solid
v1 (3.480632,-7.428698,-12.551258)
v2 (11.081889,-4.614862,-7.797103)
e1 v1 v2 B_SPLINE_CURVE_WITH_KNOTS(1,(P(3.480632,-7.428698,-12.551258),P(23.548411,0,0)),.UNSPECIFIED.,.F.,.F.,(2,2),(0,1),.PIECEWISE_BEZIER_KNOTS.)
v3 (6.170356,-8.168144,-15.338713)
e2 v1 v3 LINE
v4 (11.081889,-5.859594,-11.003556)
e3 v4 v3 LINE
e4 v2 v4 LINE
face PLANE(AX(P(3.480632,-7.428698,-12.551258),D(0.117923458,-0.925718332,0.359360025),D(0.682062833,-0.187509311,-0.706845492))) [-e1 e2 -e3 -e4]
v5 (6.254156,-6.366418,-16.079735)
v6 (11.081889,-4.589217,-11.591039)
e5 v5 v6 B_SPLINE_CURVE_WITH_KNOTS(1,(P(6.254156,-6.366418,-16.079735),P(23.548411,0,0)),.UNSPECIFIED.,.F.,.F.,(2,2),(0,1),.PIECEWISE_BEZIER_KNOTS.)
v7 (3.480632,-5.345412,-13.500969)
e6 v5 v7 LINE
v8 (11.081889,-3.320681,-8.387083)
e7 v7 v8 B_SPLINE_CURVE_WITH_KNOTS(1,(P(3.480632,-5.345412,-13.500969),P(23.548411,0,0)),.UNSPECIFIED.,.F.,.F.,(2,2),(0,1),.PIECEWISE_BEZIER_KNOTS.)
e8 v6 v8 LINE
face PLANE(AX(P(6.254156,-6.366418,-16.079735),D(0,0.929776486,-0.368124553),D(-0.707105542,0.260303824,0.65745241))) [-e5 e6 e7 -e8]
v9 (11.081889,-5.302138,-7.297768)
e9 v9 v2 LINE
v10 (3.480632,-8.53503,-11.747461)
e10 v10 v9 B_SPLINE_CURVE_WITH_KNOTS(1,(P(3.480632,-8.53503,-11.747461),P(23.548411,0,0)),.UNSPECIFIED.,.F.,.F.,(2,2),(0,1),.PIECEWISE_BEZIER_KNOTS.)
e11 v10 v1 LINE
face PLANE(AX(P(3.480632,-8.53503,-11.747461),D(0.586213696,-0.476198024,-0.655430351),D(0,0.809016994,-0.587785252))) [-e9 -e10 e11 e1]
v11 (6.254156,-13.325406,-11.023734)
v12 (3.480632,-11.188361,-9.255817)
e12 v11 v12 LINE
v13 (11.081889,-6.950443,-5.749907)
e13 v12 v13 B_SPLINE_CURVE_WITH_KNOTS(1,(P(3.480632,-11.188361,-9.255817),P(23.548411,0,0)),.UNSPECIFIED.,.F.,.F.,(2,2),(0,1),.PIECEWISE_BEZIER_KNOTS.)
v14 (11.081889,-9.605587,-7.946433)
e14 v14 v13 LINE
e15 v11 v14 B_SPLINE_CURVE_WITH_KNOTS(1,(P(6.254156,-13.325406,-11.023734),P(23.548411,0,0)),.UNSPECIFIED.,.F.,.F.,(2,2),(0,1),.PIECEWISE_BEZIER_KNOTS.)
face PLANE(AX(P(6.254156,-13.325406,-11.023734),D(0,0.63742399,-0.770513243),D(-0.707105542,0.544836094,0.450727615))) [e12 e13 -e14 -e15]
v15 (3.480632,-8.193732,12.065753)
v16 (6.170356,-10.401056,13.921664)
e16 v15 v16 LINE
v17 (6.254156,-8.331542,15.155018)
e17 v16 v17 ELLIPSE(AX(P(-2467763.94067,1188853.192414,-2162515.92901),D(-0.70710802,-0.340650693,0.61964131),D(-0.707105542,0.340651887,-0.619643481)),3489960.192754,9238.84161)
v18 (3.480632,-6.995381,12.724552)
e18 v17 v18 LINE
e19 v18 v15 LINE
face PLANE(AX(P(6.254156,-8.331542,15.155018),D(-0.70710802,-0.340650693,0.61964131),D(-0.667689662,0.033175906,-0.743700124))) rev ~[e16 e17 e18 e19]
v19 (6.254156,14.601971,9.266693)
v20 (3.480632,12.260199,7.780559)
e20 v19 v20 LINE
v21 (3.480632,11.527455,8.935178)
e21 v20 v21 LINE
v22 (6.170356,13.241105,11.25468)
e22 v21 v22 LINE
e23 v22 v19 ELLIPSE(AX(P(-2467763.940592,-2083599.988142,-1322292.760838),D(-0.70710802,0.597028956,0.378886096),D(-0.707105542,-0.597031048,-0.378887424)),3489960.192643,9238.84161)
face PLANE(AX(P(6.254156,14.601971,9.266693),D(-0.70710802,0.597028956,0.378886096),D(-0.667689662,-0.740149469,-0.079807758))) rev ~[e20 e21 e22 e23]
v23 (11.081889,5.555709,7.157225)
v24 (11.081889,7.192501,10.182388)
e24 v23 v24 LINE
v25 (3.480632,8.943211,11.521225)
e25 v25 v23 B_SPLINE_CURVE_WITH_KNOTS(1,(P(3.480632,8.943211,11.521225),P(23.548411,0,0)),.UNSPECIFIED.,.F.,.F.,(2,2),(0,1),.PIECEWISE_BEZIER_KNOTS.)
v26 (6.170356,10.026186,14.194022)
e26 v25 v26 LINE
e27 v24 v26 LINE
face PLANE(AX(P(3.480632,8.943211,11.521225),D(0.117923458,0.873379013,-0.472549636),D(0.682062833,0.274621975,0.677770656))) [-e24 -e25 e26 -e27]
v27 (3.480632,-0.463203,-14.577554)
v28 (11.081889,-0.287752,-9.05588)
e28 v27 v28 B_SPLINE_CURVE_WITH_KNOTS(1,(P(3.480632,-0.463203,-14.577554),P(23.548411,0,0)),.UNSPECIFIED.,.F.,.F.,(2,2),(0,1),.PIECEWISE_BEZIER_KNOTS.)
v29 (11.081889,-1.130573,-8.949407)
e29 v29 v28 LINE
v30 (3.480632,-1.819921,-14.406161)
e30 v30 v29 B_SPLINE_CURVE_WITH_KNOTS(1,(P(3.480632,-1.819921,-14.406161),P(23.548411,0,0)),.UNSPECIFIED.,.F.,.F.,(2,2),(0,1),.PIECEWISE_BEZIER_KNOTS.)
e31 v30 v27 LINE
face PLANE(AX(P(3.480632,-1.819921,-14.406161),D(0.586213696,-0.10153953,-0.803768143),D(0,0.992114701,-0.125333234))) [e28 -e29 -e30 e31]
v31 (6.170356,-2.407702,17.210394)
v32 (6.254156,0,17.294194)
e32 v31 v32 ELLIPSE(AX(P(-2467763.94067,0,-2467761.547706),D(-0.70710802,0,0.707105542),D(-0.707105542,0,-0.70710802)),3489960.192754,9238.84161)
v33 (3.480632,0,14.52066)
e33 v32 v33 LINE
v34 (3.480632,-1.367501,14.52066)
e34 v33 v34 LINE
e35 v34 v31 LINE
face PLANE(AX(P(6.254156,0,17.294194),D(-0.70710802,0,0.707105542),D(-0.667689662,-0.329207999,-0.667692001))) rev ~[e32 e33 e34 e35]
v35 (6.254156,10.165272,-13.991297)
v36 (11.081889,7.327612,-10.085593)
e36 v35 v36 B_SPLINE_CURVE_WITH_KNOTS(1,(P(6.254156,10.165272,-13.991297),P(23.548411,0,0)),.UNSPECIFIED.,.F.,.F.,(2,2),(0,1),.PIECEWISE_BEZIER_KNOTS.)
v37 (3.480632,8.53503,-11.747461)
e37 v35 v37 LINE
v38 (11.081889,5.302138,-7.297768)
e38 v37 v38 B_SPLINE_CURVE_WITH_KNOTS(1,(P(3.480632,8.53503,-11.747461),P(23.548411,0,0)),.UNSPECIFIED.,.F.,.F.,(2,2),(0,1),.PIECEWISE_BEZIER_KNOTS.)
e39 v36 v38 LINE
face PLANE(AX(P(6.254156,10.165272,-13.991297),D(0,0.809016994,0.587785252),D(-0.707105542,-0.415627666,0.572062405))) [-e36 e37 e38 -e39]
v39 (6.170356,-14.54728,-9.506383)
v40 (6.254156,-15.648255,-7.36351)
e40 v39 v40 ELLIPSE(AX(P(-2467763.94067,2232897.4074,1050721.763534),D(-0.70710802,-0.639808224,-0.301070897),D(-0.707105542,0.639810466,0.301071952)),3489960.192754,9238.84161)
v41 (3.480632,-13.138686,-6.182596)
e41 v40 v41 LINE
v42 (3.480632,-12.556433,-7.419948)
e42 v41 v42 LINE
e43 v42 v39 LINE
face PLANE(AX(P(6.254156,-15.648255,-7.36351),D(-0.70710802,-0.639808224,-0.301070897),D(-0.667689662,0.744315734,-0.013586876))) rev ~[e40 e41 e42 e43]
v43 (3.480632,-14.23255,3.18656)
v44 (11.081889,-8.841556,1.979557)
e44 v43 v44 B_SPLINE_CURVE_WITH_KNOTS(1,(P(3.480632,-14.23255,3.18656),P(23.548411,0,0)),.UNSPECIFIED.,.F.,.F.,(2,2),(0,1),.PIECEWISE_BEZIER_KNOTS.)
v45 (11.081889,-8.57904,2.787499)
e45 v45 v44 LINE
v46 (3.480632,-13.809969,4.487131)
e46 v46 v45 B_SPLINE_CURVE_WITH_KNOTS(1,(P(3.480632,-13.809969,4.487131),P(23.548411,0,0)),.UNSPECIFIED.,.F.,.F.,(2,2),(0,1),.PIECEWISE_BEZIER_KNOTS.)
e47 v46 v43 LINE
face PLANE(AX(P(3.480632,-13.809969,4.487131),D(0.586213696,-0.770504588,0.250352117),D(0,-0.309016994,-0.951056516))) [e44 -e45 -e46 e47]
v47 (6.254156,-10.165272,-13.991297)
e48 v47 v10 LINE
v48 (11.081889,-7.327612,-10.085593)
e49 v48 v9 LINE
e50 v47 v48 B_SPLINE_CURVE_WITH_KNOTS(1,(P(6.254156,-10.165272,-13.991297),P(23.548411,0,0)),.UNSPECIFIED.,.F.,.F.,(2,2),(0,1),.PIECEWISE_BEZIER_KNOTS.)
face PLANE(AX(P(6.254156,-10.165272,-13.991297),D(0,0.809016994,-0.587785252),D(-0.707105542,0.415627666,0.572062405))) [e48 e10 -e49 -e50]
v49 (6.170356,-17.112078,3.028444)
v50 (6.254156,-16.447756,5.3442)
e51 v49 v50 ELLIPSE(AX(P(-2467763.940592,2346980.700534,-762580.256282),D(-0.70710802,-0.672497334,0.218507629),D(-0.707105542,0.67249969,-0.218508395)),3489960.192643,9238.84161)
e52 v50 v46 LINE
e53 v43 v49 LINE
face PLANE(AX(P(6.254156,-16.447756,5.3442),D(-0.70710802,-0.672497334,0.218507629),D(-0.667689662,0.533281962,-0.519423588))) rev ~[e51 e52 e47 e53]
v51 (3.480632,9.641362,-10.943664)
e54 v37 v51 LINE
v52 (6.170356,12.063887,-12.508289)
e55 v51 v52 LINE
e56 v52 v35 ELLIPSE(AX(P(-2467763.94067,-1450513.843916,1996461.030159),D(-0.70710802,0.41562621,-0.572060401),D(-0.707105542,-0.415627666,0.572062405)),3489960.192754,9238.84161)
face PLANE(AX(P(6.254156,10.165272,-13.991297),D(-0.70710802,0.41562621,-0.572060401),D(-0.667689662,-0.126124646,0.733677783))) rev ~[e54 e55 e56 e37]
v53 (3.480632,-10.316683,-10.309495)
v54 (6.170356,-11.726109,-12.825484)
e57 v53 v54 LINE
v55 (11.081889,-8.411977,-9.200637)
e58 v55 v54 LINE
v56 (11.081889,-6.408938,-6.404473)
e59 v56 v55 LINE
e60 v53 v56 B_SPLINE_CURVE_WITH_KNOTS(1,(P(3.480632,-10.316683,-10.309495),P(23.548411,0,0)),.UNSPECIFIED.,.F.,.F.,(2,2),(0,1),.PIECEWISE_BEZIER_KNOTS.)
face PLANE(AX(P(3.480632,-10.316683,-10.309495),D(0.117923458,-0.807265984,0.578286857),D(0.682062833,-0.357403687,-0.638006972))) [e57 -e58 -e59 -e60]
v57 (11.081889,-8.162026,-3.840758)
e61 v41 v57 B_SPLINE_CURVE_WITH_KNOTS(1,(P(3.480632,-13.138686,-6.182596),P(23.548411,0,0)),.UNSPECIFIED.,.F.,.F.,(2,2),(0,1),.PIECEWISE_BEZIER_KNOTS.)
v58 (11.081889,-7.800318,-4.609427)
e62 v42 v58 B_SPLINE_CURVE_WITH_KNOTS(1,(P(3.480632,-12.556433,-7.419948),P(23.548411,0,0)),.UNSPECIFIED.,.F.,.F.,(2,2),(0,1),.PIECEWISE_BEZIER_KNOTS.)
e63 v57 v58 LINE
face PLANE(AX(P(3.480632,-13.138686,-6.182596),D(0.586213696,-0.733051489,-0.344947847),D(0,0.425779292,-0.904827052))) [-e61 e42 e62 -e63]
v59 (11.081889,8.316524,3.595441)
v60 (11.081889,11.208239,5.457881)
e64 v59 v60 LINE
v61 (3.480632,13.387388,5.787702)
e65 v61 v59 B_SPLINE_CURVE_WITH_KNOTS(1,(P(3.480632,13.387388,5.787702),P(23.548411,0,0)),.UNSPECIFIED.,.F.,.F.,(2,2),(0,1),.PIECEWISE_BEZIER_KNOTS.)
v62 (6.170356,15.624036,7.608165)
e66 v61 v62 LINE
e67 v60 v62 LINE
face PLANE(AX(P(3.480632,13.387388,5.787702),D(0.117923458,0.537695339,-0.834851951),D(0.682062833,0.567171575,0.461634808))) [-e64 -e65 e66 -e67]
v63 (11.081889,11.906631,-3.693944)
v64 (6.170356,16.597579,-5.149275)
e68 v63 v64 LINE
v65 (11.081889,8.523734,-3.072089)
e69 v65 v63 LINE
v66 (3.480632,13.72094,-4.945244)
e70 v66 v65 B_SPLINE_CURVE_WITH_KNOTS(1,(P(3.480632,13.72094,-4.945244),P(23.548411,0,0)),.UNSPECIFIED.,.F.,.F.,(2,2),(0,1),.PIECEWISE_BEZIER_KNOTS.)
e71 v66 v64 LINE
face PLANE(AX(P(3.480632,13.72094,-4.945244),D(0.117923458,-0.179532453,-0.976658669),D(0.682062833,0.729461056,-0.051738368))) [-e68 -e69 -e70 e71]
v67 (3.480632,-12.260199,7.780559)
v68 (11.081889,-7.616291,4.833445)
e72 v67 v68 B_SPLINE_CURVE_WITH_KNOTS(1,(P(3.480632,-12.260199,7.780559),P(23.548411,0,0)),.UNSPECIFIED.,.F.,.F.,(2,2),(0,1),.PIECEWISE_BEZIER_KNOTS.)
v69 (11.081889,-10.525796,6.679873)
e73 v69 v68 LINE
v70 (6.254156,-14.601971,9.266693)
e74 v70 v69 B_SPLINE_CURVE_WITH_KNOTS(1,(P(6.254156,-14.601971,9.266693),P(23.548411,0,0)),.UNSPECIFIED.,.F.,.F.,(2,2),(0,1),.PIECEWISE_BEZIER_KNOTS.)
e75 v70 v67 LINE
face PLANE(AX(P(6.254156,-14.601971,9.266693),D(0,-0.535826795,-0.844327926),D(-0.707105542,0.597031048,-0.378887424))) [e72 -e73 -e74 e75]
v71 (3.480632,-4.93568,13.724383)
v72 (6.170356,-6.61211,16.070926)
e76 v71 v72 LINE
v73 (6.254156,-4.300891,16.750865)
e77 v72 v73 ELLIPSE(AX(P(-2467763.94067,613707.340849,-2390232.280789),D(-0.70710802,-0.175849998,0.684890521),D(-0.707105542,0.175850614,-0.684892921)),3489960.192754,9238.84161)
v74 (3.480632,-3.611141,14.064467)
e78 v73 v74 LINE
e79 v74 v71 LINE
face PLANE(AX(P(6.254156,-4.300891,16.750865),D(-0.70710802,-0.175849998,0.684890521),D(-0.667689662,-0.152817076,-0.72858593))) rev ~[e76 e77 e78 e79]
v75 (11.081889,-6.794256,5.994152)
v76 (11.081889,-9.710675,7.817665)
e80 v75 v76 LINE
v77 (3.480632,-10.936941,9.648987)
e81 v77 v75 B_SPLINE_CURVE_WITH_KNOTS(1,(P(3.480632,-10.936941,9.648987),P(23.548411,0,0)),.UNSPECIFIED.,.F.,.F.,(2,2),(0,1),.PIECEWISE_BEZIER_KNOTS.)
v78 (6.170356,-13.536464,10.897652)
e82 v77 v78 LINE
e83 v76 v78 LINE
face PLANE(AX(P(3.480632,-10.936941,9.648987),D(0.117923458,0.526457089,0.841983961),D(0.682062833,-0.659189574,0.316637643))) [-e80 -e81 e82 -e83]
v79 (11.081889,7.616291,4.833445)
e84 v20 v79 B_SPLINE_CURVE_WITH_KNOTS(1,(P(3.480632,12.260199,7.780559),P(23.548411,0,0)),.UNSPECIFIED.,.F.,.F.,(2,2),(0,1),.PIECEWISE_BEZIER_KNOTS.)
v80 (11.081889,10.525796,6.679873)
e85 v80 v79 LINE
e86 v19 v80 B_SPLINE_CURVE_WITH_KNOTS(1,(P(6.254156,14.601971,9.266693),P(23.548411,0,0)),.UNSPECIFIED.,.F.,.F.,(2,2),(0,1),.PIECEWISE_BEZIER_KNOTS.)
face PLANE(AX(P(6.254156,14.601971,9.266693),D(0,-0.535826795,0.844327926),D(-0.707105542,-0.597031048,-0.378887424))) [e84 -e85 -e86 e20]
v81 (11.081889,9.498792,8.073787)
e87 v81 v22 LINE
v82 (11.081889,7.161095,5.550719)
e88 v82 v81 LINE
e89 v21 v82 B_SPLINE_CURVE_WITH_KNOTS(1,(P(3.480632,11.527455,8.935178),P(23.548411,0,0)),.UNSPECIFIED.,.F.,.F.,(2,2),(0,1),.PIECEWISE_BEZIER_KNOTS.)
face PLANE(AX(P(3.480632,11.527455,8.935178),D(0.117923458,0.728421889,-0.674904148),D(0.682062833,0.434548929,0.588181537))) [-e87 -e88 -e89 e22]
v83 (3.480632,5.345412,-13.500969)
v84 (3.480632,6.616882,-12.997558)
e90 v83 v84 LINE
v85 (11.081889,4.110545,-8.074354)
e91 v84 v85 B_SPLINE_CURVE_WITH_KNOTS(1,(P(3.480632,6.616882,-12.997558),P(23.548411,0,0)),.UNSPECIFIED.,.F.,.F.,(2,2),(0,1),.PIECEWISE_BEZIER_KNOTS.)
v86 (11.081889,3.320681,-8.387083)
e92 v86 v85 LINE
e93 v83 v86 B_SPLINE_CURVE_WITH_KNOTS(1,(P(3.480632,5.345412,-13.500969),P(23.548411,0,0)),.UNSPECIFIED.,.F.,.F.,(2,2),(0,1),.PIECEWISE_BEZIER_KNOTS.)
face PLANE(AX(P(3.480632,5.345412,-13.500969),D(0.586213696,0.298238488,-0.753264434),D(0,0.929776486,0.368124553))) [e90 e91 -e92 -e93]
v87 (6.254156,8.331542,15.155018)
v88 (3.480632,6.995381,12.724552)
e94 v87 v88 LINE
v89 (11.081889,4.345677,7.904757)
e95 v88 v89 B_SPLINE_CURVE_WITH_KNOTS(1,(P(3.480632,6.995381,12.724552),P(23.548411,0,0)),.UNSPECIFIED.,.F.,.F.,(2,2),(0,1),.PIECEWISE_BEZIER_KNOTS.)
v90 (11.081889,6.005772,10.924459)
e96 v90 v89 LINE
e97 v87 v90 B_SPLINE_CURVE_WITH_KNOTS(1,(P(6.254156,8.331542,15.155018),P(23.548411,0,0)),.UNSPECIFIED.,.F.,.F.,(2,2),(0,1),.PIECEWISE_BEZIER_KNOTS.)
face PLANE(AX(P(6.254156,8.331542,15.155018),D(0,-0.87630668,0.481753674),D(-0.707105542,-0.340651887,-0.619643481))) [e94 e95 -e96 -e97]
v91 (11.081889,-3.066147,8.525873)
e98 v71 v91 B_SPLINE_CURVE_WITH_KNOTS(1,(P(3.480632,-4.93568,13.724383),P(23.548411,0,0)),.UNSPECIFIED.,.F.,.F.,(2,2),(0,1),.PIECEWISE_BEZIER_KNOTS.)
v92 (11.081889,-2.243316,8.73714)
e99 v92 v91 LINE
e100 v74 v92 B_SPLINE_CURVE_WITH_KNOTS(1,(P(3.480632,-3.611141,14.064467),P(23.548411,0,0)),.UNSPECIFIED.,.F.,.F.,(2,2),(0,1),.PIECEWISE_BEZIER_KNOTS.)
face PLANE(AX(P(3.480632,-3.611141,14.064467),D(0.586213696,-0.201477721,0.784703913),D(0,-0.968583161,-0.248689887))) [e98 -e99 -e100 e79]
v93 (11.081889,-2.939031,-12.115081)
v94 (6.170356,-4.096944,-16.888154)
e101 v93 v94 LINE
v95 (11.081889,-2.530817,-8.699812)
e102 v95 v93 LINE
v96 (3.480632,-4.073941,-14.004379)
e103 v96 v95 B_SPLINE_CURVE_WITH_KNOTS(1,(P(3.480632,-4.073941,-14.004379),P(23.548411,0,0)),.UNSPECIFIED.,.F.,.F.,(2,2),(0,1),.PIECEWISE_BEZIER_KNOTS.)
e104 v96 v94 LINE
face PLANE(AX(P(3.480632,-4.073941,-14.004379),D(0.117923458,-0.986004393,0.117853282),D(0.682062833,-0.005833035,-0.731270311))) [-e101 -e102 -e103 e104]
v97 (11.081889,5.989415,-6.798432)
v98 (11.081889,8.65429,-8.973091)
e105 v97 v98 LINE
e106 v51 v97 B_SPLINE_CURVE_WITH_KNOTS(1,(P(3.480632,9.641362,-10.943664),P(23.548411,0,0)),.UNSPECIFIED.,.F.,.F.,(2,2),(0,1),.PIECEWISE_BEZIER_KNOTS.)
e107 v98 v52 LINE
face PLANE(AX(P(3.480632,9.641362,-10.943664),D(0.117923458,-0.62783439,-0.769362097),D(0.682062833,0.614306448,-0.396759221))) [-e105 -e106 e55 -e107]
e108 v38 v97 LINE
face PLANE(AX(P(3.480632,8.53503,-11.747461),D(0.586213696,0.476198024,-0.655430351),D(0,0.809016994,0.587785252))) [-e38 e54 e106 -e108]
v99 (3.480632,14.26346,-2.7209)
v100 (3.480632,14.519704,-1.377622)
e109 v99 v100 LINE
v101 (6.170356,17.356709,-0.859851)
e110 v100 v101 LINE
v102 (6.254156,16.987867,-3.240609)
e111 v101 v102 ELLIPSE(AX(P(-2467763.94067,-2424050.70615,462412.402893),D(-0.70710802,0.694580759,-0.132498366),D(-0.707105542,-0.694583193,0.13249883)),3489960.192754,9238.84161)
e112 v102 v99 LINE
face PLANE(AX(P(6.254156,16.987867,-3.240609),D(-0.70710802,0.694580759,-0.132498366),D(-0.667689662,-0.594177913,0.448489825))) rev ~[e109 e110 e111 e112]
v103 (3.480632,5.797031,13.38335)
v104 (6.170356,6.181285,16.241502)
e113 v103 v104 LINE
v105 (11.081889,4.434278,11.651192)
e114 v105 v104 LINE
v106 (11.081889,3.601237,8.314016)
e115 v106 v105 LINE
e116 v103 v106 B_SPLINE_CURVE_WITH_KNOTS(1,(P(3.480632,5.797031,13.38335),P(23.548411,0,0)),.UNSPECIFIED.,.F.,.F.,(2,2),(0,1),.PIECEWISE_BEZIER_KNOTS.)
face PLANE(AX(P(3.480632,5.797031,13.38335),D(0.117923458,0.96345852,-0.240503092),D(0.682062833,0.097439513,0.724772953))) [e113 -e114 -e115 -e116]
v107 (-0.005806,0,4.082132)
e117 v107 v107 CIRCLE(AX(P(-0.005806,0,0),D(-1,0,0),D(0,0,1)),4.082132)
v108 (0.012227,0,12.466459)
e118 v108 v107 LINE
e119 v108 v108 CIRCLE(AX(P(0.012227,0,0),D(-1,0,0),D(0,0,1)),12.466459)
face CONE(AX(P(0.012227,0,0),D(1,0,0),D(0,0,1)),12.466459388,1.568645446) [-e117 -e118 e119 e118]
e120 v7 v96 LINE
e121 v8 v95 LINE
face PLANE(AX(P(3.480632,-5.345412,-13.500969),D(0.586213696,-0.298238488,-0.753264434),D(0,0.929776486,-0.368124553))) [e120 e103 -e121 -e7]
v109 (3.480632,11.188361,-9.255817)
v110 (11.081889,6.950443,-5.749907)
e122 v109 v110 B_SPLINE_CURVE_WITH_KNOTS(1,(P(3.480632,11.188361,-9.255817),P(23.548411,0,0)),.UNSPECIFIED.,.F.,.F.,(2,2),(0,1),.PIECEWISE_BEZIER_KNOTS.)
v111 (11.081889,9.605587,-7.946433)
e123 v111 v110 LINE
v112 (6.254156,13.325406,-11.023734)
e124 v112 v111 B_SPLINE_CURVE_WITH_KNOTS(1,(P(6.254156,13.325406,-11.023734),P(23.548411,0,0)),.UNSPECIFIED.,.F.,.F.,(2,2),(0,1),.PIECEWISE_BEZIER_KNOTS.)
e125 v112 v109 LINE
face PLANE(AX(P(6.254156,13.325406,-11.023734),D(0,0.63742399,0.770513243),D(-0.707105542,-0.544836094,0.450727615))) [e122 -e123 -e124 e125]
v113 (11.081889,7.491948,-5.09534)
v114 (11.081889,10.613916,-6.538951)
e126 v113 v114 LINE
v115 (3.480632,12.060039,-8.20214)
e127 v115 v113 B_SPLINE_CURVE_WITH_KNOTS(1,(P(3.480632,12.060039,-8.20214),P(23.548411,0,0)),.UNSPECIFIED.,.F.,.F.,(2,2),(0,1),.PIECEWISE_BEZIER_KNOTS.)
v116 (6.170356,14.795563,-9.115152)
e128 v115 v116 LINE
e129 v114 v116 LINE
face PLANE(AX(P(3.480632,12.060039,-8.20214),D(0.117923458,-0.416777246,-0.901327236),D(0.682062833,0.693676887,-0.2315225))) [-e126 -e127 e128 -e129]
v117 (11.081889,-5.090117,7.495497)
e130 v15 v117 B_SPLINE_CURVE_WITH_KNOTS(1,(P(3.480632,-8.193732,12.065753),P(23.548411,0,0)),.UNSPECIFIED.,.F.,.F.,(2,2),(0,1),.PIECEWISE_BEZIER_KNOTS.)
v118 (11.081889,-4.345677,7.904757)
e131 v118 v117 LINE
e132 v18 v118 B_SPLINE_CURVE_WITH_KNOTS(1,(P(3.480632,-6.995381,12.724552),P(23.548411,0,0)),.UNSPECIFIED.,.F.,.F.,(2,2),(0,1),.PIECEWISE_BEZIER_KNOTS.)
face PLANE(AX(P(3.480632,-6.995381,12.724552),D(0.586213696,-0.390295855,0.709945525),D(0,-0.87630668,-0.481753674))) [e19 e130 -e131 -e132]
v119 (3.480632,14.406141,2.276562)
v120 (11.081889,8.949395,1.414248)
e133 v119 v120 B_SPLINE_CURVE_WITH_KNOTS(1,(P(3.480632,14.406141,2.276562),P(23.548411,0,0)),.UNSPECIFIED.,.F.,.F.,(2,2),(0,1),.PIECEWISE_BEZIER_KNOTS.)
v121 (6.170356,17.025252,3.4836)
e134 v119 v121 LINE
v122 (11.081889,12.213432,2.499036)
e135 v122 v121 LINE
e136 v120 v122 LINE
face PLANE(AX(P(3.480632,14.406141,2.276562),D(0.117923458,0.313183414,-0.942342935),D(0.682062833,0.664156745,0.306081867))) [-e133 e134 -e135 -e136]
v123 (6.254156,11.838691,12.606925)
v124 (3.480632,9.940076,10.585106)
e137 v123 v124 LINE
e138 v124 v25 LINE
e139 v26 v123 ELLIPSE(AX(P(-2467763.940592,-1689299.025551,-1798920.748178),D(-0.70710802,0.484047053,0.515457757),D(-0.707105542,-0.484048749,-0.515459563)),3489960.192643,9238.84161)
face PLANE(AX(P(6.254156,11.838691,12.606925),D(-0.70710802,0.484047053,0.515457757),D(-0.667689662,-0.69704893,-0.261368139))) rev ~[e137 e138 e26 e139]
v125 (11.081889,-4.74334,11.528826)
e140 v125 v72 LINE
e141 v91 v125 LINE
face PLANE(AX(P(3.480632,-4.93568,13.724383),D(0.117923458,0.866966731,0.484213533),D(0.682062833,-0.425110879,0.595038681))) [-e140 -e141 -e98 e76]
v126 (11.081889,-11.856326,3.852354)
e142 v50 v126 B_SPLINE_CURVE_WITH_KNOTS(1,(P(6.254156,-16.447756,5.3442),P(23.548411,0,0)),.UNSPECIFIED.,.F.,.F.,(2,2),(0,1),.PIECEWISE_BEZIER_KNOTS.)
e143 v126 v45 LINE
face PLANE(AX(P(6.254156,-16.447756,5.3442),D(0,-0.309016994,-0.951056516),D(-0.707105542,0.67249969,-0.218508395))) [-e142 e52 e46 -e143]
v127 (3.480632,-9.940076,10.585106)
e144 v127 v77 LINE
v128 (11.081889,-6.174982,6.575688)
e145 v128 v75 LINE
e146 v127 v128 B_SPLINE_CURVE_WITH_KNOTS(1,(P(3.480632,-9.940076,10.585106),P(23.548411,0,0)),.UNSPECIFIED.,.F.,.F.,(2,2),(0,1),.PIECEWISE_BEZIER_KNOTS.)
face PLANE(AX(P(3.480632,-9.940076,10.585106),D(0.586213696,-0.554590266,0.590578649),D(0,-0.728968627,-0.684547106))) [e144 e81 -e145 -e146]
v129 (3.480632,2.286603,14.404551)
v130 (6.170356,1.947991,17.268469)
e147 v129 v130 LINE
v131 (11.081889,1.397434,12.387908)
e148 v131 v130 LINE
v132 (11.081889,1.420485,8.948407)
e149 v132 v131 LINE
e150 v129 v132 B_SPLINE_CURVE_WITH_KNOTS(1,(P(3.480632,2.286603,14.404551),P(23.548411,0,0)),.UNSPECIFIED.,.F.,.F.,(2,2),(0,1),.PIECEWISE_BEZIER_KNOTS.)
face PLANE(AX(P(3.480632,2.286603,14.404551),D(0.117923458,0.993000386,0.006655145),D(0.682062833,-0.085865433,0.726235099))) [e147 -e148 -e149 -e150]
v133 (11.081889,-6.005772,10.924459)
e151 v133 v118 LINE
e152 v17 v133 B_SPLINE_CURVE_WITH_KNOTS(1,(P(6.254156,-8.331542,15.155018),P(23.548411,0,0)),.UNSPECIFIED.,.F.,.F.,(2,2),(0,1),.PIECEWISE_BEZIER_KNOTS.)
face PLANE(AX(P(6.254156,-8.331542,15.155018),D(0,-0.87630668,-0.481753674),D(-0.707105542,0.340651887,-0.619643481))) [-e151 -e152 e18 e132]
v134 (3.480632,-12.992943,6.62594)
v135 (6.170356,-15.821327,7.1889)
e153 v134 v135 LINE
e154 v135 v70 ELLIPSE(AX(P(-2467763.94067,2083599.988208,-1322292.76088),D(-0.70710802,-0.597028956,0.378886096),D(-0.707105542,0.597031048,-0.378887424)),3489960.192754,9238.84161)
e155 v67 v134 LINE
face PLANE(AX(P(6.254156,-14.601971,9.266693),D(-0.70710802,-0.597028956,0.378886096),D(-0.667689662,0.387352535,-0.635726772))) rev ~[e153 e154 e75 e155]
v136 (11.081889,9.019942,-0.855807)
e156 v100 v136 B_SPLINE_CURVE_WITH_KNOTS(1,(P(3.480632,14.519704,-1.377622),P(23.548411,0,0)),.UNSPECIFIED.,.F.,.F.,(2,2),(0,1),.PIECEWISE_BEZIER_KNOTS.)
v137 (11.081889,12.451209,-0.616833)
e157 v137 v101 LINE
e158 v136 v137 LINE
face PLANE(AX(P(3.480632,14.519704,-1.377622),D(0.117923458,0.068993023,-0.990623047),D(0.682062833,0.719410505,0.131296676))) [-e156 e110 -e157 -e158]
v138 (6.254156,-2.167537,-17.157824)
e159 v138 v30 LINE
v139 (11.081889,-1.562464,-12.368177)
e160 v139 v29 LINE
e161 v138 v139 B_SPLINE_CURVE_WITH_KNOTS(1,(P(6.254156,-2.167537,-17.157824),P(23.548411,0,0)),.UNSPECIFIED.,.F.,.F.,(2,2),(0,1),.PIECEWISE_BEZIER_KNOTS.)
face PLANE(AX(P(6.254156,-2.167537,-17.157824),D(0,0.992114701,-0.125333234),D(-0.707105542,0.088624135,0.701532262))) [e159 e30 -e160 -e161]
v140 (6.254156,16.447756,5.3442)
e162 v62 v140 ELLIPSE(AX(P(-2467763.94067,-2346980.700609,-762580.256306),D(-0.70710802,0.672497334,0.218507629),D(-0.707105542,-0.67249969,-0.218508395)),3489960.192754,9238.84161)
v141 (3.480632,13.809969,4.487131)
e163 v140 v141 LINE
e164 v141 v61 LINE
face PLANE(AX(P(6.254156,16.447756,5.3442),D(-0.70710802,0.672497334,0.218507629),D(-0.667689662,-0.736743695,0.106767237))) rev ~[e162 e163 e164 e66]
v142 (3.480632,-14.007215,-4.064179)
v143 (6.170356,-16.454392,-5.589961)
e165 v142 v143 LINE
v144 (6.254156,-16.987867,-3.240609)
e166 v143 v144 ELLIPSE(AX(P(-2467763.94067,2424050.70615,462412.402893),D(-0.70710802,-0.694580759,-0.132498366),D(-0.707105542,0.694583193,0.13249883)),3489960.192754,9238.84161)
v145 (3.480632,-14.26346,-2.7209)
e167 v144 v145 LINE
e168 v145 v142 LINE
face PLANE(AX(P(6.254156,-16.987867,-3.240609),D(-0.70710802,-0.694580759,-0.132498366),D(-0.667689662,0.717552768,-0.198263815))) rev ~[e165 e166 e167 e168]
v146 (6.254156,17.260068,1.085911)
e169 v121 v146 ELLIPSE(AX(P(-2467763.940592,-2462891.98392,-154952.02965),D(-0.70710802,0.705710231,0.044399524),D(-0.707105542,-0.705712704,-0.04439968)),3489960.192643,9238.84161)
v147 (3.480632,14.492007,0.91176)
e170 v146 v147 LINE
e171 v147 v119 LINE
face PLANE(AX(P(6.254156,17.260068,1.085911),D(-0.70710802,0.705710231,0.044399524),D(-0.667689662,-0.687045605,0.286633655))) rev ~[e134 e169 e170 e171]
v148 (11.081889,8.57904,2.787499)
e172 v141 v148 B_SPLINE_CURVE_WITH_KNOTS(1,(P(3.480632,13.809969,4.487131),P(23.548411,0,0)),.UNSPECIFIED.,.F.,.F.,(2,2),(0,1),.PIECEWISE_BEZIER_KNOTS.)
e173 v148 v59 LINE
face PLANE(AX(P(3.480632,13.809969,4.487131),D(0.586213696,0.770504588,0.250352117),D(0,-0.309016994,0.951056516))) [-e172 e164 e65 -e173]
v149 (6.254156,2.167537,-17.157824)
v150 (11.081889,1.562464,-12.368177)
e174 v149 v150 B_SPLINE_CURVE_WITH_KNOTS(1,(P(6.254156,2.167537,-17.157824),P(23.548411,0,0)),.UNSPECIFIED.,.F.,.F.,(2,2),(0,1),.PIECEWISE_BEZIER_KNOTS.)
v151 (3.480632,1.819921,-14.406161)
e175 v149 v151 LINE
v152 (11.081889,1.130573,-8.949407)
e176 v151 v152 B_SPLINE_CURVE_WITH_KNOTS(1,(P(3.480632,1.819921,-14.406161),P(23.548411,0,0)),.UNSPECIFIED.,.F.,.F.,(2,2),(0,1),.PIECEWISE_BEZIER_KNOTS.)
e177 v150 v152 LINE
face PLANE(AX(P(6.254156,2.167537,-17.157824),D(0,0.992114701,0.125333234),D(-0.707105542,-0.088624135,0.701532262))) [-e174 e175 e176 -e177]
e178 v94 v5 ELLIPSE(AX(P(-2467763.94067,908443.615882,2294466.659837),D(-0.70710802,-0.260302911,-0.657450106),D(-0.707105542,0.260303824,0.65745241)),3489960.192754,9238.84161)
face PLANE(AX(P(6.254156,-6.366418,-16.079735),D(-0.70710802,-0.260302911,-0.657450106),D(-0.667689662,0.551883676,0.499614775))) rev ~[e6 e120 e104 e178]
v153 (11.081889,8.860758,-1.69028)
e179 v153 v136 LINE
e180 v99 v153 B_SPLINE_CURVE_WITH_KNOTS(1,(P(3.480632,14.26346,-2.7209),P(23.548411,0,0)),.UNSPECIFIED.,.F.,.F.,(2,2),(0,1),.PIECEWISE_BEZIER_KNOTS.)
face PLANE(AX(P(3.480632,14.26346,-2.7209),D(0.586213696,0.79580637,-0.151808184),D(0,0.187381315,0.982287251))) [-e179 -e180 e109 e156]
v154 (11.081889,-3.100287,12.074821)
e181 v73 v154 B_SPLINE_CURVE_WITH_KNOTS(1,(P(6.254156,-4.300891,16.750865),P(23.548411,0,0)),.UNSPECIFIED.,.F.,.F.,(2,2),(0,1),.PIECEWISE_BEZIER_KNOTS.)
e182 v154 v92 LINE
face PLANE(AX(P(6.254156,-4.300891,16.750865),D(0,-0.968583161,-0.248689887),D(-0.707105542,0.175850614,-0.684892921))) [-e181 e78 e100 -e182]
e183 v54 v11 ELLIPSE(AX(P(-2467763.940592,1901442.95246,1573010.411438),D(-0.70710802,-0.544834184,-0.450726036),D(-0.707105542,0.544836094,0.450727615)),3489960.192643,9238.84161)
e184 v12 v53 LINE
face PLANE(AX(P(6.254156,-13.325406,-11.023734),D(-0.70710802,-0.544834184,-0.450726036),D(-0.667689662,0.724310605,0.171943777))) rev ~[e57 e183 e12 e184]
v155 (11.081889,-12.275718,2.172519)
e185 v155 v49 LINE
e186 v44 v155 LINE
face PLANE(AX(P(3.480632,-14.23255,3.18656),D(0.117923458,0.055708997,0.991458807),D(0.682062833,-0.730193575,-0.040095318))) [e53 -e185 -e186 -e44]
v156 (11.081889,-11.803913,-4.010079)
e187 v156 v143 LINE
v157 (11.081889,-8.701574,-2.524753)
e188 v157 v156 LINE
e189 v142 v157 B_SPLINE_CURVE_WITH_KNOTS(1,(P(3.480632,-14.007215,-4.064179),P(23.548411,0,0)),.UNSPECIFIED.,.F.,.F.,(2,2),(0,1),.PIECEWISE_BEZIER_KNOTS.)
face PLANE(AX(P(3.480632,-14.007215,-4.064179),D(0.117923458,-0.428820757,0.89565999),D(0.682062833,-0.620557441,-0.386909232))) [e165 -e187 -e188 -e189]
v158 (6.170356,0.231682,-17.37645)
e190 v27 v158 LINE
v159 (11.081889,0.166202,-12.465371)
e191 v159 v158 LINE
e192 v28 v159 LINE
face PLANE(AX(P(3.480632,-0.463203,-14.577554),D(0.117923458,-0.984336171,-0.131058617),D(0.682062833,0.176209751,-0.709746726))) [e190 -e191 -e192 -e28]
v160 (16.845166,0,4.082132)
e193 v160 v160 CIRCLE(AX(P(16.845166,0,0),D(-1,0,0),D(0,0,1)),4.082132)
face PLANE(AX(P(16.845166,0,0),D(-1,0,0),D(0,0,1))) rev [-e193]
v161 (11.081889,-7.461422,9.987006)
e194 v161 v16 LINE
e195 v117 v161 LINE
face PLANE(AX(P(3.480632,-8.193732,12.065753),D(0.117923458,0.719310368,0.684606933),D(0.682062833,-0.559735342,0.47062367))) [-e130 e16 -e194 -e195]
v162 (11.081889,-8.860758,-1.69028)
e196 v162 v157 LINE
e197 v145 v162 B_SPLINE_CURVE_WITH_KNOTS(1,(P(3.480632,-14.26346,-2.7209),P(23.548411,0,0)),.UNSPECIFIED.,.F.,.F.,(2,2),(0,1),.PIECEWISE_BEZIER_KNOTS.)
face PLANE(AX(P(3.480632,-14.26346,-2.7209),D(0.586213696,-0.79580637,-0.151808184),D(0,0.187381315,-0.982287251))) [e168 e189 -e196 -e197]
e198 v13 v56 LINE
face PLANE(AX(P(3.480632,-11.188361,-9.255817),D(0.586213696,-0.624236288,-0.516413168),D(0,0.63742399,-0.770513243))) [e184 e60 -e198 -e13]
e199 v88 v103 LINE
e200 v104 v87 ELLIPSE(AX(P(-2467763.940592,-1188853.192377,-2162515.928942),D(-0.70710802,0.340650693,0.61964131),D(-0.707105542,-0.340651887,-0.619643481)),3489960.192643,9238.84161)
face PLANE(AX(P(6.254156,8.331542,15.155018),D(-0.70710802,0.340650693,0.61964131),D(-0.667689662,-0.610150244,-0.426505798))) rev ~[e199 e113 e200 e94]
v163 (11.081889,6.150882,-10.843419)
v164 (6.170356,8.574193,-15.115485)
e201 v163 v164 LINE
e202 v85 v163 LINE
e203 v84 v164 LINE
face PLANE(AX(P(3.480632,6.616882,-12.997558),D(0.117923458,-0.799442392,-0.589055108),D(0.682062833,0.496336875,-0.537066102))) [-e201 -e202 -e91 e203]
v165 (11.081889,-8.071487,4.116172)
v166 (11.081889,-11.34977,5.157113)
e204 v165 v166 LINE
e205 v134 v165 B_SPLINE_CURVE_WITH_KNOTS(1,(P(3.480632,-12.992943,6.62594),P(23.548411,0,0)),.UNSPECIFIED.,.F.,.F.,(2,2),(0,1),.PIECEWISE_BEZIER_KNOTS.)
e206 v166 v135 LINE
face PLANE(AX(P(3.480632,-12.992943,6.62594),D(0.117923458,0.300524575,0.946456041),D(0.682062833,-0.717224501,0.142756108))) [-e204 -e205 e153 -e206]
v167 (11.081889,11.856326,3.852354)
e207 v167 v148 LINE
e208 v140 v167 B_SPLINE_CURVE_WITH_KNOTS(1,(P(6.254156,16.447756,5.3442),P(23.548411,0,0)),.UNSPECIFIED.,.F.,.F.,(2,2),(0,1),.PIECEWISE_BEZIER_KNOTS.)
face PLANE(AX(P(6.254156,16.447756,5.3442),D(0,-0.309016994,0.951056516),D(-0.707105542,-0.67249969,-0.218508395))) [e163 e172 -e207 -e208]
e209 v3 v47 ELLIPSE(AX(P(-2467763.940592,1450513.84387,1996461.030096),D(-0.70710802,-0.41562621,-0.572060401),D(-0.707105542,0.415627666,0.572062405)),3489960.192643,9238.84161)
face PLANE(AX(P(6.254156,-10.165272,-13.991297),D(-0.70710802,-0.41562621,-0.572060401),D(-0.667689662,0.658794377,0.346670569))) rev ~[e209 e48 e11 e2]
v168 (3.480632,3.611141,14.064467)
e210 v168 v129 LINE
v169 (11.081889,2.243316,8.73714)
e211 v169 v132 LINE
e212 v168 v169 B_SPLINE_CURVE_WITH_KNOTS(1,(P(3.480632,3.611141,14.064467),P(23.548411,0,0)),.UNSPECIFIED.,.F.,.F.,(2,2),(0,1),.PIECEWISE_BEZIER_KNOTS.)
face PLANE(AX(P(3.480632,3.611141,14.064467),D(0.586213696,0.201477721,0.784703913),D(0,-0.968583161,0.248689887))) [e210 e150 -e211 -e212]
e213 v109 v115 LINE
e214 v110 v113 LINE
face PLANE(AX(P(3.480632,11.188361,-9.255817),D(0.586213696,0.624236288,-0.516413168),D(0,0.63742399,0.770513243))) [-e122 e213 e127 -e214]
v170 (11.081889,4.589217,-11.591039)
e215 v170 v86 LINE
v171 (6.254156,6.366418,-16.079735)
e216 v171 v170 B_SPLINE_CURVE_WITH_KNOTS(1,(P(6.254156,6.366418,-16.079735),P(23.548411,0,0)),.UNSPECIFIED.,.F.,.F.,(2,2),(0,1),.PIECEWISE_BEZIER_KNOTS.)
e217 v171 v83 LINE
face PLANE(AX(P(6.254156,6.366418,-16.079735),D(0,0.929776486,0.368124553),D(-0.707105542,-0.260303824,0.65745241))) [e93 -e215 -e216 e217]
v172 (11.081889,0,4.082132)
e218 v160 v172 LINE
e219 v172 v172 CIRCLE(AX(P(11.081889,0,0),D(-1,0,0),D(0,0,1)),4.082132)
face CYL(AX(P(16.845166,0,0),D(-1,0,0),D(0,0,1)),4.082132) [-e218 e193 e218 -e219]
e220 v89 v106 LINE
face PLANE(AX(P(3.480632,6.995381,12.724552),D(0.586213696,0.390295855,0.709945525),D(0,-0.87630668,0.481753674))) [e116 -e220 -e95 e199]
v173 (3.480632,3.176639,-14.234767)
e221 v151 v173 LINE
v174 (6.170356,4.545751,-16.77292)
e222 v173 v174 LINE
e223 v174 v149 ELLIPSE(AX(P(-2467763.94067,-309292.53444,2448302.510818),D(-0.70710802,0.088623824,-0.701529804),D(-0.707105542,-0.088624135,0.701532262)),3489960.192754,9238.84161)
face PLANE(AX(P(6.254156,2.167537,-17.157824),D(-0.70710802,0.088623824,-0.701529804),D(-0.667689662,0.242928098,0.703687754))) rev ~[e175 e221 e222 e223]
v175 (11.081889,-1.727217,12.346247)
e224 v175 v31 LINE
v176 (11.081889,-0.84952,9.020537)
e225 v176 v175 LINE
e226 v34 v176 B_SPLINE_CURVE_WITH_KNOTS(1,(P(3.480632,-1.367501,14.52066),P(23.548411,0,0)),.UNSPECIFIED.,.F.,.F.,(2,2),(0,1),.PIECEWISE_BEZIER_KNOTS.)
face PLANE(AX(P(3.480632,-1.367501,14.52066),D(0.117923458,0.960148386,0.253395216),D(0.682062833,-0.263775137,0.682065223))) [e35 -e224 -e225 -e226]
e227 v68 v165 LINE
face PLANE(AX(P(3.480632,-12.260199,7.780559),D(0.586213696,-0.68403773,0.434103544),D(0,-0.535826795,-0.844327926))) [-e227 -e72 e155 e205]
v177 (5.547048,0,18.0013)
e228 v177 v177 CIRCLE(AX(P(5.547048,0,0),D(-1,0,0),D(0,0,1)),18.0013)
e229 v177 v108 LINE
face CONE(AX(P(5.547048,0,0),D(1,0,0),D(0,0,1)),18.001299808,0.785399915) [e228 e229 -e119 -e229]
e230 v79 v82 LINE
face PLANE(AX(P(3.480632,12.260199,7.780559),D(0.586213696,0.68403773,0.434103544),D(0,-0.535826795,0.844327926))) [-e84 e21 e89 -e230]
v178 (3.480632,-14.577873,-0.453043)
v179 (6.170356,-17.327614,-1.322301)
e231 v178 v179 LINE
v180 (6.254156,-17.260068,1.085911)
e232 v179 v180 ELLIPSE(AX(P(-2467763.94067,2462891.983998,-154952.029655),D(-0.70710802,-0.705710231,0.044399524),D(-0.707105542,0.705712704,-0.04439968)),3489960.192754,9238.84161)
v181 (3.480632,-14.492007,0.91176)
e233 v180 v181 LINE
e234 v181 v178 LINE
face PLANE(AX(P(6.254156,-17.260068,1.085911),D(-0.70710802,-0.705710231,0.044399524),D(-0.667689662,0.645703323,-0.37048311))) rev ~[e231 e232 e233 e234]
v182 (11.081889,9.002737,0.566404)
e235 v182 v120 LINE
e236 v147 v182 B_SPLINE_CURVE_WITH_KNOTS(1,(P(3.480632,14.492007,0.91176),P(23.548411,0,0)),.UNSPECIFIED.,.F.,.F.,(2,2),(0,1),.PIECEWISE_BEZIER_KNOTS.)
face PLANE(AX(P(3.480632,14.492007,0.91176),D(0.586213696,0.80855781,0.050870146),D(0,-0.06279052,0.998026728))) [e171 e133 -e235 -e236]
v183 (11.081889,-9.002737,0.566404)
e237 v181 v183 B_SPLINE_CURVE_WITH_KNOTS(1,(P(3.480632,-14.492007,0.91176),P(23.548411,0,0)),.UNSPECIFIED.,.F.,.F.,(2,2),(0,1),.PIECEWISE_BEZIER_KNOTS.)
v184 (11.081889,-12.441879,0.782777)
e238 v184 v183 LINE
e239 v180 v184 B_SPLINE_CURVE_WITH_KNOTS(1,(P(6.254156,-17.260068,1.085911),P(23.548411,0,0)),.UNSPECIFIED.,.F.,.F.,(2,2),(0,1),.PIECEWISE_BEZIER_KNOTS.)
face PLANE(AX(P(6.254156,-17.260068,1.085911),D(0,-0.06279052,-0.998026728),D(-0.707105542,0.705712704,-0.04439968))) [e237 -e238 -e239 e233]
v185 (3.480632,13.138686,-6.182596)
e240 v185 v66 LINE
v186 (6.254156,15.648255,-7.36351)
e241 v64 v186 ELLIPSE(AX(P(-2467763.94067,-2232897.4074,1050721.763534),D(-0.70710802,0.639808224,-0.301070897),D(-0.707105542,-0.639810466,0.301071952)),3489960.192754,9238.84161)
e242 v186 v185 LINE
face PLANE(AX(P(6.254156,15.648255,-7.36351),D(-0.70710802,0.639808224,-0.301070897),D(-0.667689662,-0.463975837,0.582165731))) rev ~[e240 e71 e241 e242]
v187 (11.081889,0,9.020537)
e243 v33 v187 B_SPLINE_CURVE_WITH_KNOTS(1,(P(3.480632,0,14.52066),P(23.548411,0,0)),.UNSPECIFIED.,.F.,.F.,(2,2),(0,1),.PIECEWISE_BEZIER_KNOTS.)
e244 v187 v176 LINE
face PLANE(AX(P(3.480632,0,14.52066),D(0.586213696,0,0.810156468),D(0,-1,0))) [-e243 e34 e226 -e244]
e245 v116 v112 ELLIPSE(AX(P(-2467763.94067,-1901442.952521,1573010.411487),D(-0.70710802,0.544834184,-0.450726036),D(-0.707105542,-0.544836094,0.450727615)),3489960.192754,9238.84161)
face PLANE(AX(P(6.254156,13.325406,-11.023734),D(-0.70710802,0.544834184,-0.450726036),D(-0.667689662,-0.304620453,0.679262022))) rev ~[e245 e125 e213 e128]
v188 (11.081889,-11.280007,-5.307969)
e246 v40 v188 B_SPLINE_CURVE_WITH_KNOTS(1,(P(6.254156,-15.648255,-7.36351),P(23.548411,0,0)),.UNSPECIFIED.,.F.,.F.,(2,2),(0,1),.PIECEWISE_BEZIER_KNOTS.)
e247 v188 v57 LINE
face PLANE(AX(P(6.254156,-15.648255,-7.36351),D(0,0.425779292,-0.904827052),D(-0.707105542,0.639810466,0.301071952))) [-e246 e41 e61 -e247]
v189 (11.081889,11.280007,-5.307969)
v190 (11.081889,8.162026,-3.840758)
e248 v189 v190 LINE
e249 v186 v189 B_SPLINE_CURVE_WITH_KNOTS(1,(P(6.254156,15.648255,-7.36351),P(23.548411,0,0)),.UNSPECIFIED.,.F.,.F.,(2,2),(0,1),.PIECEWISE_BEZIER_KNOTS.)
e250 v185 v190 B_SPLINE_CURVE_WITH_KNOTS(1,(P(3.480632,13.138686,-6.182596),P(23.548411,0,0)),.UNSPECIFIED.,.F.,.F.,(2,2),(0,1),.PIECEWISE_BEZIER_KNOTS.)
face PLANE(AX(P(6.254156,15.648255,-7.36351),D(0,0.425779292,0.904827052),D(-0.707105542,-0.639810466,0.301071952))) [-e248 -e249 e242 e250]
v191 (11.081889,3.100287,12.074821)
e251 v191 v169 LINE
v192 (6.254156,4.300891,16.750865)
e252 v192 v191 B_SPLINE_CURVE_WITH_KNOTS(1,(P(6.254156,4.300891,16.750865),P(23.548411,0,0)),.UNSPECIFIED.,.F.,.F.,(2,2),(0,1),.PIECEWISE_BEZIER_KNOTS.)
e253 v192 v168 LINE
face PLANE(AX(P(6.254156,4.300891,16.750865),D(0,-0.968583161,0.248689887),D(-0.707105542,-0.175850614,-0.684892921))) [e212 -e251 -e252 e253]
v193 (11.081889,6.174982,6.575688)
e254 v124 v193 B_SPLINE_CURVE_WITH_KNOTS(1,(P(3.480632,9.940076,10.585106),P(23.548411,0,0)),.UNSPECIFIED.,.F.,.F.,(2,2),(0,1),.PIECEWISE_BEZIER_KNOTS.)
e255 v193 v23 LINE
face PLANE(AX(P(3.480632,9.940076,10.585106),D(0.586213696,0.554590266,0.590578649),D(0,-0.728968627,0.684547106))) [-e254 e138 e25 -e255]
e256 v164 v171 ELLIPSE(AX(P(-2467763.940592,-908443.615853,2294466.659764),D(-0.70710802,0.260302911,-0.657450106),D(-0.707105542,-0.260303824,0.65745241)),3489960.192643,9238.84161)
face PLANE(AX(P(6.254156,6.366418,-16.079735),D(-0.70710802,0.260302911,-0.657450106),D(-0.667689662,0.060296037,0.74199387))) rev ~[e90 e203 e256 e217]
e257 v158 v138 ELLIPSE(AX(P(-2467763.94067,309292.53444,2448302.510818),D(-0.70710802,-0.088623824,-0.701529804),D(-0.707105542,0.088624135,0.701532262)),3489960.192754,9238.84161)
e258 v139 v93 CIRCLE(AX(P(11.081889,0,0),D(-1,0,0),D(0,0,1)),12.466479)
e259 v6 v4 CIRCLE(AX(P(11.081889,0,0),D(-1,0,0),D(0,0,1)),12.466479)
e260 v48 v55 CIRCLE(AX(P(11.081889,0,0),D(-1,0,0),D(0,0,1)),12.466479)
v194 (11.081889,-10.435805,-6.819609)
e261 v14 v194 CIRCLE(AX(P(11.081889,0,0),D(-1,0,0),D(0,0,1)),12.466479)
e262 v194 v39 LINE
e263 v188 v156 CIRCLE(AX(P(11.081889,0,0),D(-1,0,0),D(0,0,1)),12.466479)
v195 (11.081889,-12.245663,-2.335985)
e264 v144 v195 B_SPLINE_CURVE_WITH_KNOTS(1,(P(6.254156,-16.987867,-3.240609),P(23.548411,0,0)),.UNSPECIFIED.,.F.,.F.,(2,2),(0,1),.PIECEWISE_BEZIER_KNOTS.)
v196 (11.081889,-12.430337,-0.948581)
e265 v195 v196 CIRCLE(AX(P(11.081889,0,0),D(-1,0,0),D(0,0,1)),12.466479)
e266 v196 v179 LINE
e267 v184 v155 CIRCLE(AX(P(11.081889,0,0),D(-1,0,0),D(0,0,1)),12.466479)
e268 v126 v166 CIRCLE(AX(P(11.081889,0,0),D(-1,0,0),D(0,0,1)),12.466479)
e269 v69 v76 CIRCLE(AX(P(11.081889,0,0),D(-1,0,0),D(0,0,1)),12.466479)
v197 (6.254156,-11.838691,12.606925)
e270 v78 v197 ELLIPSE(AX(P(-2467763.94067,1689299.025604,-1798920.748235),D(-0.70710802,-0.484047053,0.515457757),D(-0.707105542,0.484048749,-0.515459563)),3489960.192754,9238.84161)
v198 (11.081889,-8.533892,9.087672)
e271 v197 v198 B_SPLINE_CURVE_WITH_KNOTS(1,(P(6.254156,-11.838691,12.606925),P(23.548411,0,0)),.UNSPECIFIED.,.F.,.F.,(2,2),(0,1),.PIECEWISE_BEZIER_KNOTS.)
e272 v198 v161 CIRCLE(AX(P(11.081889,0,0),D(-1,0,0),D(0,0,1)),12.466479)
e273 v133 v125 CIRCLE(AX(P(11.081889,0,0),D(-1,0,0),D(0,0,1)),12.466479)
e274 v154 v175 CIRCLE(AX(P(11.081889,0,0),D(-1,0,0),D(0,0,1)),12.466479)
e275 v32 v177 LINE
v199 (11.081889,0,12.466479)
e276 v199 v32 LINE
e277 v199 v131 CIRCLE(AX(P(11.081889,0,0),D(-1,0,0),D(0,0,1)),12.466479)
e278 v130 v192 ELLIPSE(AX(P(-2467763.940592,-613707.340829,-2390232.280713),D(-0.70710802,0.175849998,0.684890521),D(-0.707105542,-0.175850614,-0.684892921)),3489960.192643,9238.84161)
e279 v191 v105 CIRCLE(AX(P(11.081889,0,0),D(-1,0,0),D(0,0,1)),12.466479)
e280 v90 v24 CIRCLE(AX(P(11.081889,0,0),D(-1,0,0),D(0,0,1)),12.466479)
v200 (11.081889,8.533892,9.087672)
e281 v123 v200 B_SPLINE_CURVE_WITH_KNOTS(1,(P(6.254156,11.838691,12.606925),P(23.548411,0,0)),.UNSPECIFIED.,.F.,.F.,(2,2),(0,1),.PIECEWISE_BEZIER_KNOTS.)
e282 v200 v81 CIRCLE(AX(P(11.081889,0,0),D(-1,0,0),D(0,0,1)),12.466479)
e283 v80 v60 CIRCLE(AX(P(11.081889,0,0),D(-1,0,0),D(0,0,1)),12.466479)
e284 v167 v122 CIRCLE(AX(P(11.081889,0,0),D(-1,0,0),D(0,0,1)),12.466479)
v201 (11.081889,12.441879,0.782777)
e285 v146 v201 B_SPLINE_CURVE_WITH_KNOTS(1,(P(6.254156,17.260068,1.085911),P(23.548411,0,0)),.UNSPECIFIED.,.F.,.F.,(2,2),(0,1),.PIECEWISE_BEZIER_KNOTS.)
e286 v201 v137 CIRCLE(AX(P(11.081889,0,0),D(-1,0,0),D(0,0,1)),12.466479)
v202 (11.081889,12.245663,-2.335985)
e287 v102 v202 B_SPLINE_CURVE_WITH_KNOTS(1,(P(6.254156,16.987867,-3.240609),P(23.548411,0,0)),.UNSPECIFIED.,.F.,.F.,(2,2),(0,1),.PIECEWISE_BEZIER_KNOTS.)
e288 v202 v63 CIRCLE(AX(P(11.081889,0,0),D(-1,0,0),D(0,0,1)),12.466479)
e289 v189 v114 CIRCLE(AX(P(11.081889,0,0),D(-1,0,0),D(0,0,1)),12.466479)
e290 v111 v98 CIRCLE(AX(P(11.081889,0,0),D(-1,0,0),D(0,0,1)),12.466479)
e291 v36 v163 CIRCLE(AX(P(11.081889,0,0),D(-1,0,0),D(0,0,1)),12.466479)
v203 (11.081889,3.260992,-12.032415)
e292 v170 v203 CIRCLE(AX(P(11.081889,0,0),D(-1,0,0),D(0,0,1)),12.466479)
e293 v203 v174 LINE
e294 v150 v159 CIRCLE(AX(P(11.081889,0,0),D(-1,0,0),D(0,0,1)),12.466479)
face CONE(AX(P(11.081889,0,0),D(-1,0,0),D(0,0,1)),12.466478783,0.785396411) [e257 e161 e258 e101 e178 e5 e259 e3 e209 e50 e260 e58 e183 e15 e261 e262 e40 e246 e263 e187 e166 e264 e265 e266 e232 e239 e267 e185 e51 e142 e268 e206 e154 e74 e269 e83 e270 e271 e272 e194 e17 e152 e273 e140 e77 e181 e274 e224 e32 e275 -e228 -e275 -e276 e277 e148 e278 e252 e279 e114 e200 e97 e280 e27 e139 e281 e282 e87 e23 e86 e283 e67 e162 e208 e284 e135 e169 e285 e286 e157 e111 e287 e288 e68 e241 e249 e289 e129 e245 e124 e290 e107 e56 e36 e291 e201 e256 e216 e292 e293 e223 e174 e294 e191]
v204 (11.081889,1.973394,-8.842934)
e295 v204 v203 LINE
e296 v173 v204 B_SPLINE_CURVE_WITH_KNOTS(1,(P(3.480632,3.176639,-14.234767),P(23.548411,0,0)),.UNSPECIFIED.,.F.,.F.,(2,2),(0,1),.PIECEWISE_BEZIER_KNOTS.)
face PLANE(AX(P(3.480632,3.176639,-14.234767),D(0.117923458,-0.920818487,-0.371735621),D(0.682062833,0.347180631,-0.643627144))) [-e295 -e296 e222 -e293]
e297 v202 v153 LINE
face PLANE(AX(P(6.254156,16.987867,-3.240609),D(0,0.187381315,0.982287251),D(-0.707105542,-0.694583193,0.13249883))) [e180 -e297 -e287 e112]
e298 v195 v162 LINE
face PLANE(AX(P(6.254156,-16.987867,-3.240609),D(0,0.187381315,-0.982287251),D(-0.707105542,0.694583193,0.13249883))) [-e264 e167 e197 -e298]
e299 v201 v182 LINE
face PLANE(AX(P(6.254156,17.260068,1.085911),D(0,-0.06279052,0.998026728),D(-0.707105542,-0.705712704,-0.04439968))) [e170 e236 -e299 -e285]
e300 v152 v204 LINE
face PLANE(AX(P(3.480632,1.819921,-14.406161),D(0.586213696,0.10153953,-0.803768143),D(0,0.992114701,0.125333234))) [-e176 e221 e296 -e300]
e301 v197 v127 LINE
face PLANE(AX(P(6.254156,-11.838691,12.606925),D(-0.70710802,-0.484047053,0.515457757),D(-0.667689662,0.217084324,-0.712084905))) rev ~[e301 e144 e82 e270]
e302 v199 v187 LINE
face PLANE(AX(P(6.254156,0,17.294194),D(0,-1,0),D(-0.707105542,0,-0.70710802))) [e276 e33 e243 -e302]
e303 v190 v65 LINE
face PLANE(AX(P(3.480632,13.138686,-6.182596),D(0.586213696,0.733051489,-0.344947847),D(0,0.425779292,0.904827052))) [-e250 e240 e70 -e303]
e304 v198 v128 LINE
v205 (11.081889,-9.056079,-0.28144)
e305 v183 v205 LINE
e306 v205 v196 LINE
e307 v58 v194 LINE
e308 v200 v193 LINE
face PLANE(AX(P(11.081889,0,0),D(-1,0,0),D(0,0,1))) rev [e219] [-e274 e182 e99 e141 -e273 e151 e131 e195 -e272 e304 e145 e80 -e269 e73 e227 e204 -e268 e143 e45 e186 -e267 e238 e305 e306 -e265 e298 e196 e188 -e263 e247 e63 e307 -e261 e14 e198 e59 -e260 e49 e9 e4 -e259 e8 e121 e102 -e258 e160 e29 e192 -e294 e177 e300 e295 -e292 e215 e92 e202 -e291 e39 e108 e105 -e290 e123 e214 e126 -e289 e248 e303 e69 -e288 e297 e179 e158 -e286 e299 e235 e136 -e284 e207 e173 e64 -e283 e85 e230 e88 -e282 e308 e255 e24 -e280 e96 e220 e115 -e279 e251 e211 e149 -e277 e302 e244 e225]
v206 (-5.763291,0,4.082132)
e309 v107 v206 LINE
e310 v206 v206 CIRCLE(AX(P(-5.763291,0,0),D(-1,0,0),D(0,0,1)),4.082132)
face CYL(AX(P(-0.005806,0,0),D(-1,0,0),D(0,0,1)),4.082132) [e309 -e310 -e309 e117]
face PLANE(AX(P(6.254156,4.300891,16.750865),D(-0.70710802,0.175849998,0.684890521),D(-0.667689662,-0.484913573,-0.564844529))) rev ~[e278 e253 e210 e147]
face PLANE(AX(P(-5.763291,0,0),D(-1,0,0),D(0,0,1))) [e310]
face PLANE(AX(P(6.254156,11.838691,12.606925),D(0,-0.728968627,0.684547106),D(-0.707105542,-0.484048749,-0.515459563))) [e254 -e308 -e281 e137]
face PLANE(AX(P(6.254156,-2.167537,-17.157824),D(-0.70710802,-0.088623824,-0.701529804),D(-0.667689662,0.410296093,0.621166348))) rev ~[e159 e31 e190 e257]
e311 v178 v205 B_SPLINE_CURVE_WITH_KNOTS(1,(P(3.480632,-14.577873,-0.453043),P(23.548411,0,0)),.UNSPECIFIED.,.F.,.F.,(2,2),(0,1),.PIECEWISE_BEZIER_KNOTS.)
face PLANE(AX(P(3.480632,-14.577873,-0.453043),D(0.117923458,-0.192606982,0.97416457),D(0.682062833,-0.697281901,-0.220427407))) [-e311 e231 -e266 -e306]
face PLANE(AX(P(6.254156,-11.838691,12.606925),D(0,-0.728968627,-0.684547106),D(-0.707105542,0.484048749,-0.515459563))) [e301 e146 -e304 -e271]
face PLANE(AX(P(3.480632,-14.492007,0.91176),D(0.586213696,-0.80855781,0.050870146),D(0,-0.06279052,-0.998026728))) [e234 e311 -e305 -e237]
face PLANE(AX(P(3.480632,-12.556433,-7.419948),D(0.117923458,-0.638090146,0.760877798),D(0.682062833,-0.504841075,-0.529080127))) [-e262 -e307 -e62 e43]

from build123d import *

# Parameters (mm, degrees)
F7_COUNT = 25
F7_ANGLE = 345.6


with BuildPart() as f1:
    # F0 (on Front) → F1 (revolve)
    with BuildSketch(Plane.XZ):
        Polygon((5.5470483679, 18.0012998082), (0.0122273423, 12.4664593884), (-0.0058063755, 4.0821318731), (-5.763291413, 4.0821318731), (-5.763291413, 0), (0, 0), (16.8451661991, 0), (16.8451661991, 4.0821318731), (11.0818887877, 4.0821318731), (11.0818887877, 12.4664787826), align=None)
    revolve(axis=Axis((8.4225830996, 0, 0), (-1, 0, 0)))


with BuildPart() as f6:
    # F5 (on face) → F6 section 0
    with BuildSketch(Plane(origin=(-5.5200079815, 0, 5.5199886393), x_dir=(0, -1, 0), z_dir=(-0.70710802, 0, 0.7071055423)), mode=Mode.PRIVATE) as f6_s0:
        Polygon((0, 16.6512121101), (0, 12.7288497215), (1.3675010996, 12.7288497215), (2.4401100818, 16.6512121101), align=None)
    loft([f6_s0.sketch, Vertex(23.5484112532, 0, 0)])


with BuildPart() as f7_1:
    # F7: instance of F6
    add(f6.part.rotate(Axis((16.8451661991, 0, 0), (-1, 0, 0)), 1 * F7_ANGLE / (F7_COUNT - 1)))


with BuildPart() as f7_2:
    # F7: instance of F6
    add(f6.part.rotate(Axis((16.8451661991, 0, 0), (-1, 0, 0)), 2 * F7_ANGLE / (F7_COUNT - 1)))


with BuildPart() as f7_3:
    # F7: instance of F6
    add(f6.part.rotate(Axis((16.8451661991, 0, 0), (-1, 0, 0)), 3 * F7_ANGLE / (F7_COUNT - 1)))


with BuildPart() as f7_4:
    # F7: instance of F6
    add(f6.part.rotate(Axis((16.8451661991, 0, 0), (-1, 0, 0)), 4 * F7_ANGLE / (F7_COUNT - 1)))


with BuildPart() as f7_5:
    # F7: instance of F6
    add(f6.part.rotate(Axis((16.8451661991, 0, 0), (-1, 0, 0)), 5 * F7_ANGLE / (F7_COUNT - 1)))


with BuildPart() as f7_6:
    # F7: instance of F6
    add(f6.part.rotate(Axis((16.8451661991, 0, 0), (-1, 0, 0)), 6 * F7_ANGLE / (F7_COUNT - 1)))


with BuildPart() as f7_7:
    # F7: instance of F6
    add(f6.part.rotate(Axis((16.8451661991, 0, 0), (-1, 0, 0)), 7 * F7_ANGLE / (F7_COUNT - 1)))


with BuildPart() as f7_8:
    # F7: instance of F6
    add(f6.part.rotate(Axis((16.8451661991, 0, 0), (-1, 0, 0)), 8 * F7_ANGLE / (F7_COUNT - 1)))


with BuildPart() as f7_9:
    # F7: instance of F6
    add(f6.part.rotate(Axis((16.8451661991, 0, 0), (-1, 0, 0)), 9 * F7_ANGLE / (F7_COUNT - 1)))


with BuildPart() as f7_10:
    # F7: instance of F6
    add(f6.part.rotate(Axis((16.8451661991, 0, 0), (-1, 0, 0)), 10 * F7_ANGLE / (F7_COUNT - 1)))


with BuildPart() as f7_11:
    # F7: instance of F6
    add(f6.part.rotate(Axis((16.8451661991, 0, 0), (-1, 0, 0)), 11 * F7_ANGLE / (F7_COUNT - 1)))


with BuildPart() as f7_12:
    # F7: instance of F6
    add(f6.part.rotate(Axis((16.8451661991, 0, 0), (-1, 0, 0)), 12 * F7_ANGLE / (F7_COUNT - 1)))


with BuildPart() as f7_13:
    # F7: instance of F6
    add(f6.part.rotate(Axis((16.8451661991, 0, 0), (-1, 0, 0)), 13 * F7_ANGLE / (F7_COUNT - 1)))


with BuildPart() as f7_14:
    # F7: instance of F6
    add(f6.part.rotate(Axis((16.8451661991, 0, 0), (-1, 0, 0)), 14 * F7_ANGLE / (F7_COUNT - 1)))


with BuildPart() as f7_15:
    # F7: instance of F6
    add(f6.part.rotate(Axis((16.8451661991, 0, 0), (-1, 0, 0)), 15 * F7_ANGLE / (F7_COUNT - 1)))


with BuildPart() as f7_16:
    # F7: instance of F6
    add(f6.part.rotate(Axis((16.8451661991, 0, 0), (-1, 0, 0)), 16 * F7_ANGLE / (F7_COUNT - 1)))


with BuildPart() as f7_17:
    # F7: instance of F6
    add(f6.part.rotate(Axis((16.8451661991, 0, 0), (-1, 0, 0)), 17 * F7_ANGLE / (F7_COUNT - 1)))


with BuildPart() as f7_18:
    # F7: instance of F6
    add(f6.part.rotate(Axis((16.8451661991, 0, 0), (-1, 0, 0)), 18 * F7_ANGLE / (F7_COUNT - 1)))


with BuildPart() as f7_19:
    # F7: instance of F6
    add(f6.part.rotate(Axis((16.8451661991, 0, 0), (-1, 0, 0)), 19 * F7_ANGLE / (F7_COUNT - 1)))


with BuildPart() as f7_20:
    # F7: instance of F6
    add(f6.part.rotate(Axis((16.8451661991, 0, 0), (-1, 0, 0)), 20 * F7_ANGLE / (F7_COUNT - 1)))


with BuildPart() as f7_21:
    # F7: instance of F6
    add(f6.part.rotate(Axis((16.8451661991, 0, 0), (-1, 0, 0)), 21 * F7_ANGLE / (F7_COUNT - 1)))


with BuildPart() as f7_22:
    # F7: instance of F6
    add(f6.part.rotate(Axis((16.8451661991, 0, 0), (-1, 0, 0)), 22 * F7_ANGLE / (F7_COUNT - 1)))


with BuildPart() as f7_23:
    # F7: instance of F6
    add(f6.part.rotate(Axis((16.8451661991, 0, 0), (-1, 0, 0)), 23 * F7_ANGLE / (F7_COUNT - 1)))


with BuildPart() as f7_24:
    # F7: instance of F6
    add(f6.part.rotate(Axis((16.8451661991, 0, 0), (-1, 0, 0)), 24 * F7_ANGLE / (F7_COUNT - 1)))


with BuildPart() as f1_1:
    add(f1.part)

    # F8: cut F6, F7_1, F7_2, F7_3, F7_4, F7_5, F7_6, F7_7, F7_8, F7_9, F7_10, F7_11, F7_12, F7_13, F7_14, F7_15, F7_16, F7_17, F7_18, F7_19, F7_20, F7_21, F7_22, F7_23, F7_24
    add(f6.part, mode=Mode.SUBTRACT)
    add(f7_1.part, mode=Mode.SUBTRACT)
    add(f7_2.part, mode=Mode.SUBTRACT)
    add(f7_3.part, mode=Mode.SUBTRACT)
    add(f7_4.part, mode=Mode.SUBTRACT)
    add(f7_5.part, mode=Mode.SUBTRACT)
    add(f7_6.part, mode=Mode.SUBTRACT)
    add(f7_7.part, mode=Mode.SUBTRACT)
    add(f7_8.part, mode=Mode.SUBTRACT)
    add(f7_9.part, mode=Mode.SUBTRACT)
    add(f7_10.part, mode=Mode.SUBTRACT)
    add(f7_11.part, mode=Mode.SUBTRACT)
    add(f7_12.part, mode=Mode.SUBTRACT)
    add(f7_13.part, mode=Mode.SUBTRACT)
    add(f7_14.part, mode=Mode.SUBTRACT)
    add(f7_15.part, mode=Mode.SUBTRACT)
    add(f7_16.part, mode=Mode.SUBTRACT)
    add(f7_17.part, mode=Mode.SUBTRACT)
    add(f7_18.part, mode=Mode.SUBTRACT)
    add(f7_19.part, mode=Mode.SUBTRACT)
    add(f7_20.part, mode=Mode.SUBTRACT)
    add(f7_21.part, mode=Mode.SUBTRACT)
    add(f7_22.part, mode=Mode.SUBTRACT)
    add(f7_23.part, mode=Mode.SUBTRACT)
    add(f7_24.part, mode=Mode.SUBTRACT)


solid = f1_1.part
